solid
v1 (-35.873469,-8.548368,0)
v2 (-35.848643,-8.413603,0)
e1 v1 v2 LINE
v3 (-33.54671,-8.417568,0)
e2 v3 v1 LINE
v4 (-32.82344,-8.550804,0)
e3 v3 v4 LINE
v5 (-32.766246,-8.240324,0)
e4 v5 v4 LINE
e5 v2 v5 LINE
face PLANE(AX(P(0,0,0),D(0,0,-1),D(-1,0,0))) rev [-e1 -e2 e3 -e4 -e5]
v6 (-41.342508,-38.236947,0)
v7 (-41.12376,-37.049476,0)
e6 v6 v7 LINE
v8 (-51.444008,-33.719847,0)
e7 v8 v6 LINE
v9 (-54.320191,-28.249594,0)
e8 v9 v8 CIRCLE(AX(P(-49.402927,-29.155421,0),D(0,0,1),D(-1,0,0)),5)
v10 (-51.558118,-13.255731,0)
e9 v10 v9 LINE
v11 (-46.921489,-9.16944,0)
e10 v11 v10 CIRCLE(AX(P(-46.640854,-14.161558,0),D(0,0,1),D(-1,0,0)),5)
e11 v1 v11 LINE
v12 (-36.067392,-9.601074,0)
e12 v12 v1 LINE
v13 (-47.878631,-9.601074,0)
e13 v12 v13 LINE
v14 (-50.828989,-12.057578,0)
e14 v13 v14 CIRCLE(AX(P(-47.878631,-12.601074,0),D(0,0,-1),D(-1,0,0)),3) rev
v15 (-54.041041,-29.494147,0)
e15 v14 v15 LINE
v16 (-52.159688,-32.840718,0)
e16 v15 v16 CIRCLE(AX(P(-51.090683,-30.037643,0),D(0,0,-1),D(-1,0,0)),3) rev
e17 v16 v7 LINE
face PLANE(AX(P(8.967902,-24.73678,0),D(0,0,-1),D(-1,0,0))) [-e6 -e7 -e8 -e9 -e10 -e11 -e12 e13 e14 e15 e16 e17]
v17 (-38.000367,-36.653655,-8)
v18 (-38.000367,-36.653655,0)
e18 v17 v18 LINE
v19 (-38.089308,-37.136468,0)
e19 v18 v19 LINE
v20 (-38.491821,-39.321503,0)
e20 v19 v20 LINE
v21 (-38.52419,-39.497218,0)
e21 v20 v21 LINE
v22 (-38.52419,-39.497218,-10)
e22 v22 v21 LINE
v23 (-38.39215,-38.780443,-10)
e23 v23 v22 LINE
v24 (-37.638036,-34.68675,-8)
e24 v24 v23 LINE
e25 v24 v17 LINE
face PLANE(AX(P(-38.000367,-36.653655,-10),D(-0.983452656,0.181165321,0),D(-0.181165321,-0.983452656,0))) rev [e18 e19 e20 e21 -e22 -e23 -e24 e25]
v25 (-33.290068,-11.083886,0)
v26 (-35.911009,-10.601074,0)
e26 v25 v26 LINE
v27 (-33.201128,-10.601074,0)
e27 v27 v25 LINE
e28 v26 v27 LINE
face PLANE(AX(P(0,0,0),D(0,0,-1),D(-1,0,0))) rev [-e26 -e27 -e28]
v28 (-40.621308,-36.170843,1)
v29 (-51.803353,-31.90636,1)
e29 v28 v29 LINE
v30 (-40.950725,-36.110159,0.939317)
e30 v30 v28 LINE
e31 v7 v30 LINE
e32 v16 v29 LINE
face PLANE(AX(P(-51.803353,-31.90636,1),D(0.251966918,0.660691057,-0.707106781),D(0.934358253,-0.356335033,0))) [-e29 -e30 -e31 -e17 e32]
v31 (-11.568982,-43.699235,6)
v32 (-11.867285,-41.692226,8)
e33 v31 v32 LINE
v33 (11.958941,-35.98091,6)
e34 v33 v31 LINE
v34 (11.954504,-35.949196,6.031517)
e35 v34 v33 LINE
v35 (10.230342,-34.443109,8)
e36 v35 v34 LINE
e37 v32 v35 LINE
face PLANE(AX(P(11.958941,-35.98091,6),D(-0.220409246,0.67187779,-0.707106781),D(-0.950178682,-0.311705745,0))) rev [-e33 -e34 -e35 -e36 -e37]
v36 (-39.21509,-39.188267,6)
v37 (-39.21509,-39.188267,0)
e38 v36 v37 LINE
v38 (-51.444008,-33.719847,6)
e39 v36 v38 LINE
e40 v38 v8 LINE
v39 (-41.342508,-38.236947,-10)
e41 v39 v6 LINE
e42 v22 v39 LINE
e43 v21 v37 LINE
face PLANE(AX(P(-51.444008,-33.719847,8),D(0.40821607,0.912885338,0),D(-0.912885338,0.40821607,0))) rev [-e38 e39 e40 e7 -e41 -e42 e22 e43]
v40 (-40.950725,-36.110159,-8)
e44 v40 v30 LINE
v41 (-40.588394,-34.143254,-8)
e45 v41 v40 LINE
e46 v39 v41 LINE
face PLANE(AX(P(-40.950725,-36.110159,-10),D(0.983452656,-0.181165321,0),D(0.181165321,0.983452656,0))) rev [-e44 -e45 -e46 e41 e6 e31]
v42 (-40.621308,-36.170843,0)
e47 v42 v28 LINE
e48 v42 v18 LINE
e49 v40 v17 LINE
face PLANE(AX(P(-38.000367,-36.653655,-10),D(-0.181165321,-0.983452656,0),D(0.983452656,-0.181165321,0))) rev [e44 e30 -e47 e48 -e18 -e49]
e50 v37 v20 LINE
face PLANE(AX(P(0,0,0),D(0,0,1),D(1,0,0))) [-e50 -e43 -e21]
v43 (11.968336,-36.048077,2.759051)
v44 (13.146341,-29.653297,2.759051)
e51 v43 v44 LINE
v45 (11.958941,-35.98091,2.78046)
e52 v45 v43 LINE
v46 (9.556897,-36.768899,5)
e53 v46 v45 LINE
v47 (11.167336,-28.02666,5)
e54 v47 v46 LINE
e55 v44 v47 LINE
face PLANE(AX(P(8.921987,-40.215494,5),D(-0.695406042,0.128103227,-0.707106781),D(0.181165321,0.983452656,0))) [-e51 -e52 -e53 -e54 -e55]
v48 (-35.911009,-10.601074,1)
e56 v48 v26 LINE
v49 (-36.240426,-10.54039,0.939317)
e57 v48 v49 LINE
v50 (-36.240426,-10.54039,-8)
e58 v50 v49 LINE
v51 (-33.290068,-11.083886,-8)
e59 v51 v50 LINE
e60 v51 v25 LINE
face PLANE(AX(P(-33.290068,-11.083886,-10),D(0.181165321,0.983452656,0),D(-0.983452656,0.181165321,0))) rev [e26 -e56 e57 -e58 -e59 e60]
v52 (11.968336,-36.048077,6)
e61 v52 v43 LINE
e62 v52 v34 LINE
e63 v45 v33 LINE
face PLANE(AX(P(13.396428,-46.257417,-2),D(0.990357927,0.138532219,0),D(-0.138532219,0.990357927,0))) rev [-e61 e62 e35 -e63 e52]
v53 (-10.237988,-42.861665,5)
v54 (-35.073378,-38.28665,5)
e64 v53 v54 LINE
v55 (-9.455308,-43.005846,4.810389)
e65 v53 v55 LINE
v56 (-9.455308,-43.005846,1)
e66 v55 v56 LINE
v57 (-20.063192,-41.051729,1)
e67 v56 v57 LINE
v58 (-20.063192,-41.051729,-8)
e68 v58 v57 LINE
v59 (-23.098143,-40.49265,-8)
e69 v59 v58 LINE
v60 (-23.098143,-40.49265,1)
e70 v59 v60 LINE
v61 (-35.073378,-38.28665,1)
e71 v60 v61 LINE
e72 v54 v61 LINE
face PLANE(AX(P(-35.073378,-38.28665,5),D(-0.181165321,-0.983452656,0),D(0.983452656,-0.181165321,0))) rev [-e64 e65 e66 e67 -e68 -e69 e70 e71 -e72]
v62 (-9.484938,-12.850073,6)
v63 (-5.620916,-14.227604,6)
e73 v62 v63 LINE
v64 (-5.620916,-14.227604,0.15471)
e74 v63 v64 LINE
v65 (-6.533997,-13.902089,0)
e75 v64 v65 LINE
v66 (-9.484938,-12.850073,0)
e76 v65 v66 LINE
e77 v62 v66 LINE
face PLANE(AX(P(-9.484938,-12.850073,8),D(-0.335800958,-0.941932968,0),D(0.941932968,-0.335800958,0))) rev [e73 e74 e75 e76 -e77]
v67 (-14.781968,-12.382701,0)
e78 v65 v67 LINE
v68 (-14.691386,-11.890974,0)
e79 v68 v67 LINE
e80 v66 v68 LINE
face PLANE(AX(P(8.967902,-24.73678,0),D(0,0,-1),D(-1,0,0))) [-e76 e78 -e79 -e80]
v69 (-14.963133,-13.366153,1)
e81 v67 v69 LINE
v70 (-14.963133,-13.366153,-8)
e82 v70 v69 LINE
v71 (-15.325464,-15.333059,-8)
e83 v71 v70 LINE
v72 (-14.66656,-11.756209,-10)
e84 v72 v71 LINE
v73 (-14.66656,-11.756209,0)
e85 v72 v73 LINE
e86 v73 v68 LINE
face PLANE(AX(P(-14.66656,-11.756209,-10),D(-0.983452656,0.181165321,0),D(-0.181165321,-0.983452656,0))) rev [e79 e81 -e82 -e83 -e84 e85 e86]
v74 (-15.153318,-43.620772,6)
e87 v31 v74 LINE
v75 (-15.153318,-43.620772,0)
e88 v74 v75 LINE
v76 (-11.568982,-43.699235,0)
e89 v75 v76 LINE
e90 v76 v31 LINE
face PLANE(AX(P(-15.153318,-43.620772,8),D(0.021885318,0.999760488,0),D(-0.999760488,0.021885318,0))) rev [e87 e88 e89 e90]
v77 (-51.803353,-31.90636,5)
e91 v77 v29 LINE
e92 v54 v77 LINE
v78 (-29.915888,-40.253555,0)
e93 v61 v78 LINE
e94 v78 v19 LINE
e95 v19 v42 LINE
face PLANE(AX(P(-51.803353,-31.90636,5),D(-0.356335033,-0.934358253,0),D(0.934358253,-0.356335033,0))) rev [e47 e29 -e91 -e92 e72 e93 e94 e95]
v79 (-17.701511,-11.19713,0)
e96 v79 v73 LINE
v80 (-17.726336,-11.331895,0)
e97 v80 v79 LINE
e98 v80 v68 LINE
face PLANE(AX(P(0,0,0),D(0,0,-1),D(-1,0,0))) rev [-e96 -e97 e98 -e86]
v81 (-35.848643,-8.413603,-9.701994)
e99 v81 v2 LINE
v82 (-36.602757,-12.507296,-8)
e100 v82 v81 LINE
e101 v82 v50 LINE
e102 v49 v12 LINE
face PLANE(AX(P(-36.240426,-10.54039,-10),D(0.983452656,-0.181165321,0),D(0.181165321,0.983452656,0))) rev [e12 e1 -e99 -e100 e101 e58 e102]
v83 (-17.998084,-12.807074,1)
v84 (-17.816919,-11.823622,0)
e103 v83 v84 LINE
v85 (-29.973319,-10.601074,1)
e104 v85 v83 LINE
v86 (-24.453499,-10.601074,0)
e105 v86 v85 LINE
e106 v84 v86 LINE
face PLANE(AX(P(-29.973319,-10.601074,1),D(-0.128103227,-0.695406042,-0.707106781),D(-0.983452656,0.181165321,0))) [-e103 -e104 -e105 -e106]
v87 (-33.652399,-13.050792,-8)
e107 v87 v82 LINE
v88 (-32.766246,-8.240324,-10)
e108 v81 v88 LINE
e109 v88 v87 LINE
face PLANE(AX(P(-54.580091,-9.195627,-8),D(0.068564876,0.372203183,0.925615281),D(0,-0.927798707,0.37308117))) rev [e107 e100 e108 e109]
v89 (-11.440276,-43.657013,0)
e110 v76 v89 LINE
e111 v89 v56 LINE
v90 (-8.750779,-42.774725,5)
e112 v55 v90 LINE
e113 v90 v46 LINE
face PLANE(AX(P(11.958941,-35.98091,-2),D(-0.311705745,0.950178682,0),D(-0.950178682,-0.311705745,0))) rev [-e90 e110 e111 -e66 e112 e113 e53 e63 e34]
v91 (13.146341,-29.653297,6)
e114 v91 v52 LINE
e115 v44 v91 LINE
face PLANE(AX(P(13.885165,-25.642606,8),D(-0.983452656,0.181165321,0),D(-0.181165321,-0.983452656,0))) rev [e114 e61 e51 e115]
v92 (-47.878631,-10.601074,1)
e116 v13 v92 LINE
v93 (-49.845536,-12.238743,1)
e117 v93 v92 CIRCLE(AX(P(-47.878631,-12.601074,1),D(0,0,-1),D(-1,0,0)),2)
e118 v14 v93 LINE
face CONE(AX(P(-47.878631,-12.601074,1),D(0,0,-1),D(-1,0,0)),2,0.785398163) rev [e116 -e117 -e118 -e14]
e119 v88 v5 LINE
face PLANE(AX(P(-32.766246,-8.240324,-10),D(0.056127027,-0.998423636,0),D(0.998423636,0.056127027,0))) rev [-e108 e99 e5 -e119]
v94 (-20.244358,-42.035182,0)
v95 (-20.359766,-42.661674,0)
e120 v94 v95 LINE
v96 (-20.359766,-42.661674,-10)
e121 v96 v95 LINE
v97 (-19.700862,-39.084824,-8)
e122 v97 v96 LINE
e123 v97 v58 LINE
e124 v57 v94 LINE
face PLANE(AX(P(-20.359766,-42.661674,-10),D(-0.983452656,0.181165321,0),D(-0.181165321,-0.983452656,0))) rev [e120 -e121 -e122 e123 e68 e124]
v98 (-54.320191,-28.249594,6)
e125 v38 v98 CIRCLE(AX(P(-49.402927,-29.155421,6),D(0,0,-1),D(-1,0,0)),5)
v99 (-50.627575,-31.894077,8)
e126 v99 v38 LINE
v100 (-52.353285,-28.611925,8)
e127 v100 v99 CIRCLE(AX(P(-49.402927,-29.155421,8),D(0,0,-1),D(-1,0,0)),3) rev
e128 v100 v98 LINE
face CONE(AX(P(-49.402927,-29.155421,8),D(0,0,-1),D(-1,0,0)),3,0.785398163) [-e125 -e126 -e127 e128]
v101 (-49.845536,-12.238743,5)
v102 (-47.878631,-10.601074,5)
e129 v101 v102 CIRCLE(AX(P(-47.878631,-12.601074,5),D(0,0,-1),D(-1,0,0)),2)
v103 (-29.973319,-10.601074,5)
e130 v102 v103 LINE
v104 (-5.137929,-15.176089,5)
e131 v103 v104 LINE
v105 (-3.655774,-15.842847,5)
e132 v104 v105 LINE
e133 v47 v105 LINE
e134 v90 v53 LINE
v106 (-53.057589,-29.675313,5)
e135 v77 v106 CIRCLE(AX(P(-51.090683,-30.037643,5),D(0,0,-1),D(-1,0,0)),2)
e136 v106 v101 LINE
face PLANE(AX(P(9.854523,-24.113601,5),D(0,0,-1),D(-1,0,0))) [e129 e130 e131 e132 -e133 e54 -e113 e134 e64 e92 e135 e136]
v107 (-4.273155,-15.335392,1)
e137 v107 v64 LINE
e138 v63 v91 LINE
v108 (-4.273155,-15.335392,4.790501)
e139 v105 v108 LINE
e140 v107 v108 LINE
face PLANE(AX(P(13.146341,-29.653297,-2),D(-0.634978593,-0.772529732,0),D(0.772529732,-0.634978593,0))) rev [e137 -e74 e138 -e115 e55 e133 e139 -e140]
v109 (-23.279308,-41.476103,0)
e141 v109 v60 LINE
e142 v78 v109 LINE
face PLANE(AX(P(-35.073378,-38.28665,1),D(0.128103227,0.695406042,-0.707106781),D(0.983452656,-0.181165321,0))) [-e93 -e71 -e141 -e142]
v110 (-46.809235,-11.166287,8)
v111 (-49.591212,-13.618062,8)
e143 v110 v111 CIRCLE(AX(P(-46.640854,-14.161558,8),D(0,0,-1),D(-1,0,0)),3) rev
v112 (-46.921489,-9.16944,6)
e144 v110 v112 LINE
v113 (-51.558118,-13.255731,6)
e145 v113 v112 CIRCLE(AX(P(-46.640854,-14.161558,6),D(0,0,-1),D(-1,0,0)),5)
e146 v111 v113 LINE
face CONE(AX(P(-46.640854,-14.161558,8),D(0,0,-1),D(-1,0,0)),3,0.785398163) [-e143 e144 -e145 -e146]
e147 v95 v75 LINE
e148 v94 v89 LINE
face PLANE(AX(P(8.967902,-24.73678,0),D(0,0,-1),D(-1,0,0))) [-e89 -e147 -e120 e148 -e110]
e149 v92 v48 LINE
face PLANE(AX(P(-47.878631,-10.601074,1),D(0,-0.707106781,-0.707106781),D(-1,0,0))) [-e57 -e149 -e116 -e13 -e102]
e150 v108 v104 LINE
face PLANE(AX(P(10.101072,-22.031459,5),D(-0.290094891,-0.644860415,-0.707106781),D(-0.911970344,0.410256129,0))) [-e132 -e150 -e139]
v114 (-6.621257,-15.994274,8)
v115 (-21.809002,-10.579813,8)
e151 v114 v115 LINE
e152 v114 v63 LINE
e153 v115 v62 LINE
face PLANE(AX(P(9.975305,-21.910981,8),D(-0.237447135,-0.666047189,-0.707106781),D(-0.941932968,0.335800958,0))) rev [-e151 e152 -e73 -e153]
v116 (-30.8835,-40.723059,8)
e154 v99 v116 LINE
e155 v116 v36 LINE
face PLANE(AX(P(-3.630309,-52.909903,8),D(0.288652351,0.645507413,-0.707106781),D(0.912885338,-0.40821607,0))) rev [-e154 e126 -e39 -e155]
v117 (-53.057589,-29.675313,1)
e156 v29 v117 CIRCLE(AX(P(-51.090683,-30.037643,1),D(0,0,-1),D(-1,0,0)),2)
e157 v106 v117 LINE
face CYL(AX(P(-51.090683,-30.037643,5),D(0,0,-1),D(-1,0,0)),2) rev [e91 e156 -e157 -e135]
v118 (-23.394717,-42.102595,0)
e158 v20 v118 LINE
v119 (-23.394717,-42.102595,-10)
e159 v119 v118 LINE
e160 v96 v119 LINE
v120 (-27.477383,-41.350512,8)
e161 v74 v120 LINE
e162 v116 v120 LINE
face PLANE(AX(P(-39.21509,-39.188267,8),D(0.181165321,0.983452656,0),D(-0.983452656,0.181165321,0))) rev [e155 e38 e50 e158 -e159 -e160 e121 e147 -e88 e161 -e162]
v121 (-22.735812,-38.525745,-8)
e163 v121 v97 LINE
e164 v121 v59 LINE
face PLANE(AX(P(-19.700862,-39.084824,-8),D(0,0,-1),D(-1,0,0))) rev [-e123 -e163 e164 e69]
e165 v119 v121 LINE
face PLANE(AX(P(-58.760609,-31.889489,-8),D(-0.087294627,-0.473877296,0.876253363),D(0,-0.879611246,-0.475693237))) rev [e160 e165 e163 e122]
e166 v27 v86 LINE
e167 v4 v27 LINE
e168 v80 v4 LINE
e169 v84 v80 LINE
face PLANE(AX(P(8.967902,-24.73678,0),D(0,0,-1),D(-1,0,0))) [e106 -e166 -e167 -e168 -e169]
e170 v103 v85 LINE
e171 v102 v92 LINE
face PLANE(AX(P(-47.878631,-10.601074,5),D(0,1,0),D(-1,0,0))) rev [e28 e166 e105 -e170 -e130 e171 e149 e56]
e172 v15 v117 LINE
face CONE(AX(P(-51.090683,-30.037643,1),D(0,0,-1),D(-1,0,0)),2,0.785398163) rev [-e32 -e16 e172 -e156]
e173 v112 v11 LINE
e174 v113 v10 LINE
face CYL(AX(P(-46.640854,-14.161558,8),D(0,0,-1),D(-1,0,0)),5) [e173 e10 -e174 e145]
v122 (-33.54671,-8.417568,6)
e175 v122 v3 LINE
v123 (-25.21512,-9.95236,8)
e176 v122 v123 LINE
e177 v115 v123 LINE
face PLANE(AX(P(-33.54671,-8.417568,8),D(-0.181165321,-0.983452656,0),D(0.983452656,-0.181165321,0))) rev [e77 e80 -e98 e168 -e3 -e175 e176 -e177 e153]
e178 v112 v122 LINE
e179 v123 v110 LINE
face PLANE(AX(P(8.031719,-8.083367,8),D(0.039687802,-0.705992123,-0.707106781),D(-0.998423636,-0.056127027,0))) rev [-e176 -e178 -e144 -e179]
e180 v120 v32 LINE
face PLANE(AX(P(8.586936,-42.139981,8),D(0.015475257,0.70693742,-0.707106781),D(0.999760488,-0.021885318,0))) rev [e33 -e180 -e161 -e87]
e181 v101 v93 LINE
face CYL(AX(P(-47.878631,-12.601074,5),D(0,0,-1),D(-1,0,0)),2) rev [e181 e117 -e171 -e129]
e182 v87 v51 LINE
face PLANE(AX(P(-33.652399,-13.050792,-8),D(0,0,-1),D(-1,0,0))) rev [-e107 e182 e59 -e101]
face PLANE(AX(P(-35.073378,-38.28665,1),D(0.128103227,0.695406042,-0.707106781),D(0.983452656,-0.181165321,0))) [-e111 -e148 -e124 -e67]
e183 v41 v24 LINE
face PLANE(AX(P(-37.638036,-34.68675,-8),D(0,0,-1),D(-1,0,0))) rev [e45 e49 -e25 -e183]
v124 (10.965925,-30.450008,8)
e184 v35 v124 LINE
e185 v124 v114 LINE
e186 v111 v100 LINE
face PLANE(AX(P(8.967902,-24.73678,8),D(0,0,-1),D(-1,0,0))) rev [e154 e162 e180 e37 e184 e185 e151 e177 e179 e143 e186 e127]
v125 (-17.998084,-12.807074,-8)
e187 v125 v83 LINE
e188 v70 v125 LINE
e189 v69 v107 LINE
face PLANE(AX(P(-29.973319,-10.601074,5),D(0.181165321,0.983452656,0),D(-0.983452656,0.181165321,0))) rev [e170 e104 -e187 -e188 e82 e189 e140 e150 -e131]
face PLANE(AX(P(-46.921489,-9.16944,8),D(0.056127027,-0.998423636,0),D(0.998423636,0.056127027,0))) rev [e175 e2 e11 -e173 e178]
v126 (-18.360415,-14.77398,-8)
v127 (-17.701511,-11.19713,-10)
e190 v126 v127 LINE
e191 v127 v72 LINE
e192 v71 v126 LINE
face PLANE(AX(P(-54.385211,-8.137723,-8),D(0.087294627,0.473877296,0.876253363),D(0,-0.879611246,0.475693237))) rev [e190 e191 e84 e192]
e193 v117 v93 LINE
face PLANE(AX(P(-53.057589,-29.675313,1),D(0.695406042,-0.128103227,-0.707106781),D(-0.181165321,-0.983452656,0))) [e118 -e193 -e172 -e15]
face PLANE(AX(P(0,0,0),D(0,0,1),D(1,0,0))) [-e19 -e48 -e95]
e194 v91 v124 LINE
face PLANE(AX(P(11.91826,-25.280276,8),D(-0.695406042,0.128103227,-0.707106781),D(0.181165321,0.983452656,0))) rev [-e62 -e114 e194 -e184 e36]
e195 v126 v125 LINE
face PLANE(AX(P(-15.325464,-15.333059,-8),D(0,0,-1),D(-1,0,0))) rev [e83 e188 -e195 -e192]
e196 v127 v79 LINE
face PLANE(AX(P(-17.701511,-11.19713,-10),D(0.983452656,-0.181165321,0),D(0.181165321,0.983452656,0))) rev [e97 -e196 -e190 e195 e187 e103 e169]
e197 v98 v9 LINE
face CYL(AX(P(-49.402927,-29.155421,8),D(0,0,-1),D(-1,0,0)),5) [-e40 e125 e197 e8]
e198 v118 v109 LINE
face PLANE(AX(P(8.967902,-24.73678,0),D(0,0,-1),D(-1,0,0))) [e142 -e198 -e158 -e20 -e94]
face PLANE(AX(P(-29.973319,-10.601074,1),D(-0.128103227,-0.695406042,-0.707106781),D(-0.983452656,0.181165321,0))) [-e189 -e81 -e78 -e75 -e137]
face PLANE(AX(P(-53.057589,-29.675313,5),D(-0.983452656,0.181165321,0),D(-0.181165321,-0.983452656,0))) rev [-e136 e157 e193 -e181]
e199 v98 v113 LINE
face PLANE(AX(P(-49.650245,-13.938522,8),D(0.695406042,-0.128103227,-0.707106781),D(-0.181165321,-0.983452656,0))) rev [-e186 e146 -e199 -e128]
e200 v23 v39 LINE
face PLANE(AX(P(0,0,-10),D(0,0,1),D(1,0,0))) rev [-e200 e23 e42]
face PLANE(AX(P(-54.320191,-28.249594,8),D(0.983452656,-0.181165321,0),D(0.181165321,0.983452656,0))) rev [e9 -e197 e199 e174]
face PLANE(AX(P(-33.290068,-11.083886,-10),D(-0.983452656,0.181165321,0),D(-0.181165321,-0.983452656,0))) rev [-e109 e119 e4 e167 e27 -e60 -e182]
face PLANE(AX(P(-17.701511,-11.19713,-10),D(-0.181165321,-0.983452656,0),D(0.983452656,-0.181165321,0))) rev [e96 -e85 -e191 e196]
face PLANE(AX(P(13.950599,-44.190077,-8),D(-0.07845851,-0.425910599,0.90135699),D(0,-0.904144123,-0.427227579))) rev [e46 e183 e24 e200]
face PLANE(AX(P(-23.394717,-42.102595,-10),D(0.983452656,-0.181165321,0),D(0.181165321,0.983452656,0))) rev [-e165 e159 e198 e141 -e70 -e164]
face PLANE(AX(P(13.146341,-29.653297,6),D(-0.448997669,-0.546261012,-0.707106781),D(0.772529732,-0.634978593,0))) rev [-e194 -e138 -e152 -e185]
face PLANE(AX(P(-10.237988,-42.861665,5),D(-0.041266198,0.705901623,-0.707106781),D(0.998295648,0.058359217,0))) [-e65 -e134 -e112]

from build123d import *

# Parameters (mm, degrees)
BOSS_EXTRUDE1_DEPTH = 8
CUT_EXTRUDE1_DEPTH  = 5
CHAMFER1_SIZE       = 2
CHAMFER2_SIZE       = 2
BOSS_EXTRUDE2_DEPTH = 10
CHAMFER3_SIZE       = 5
CHAMFER5_SIZE       = 1
SKETCH4_W           = 3
SKETCH4_H           = 2
BOSS_EXTRUDE3_DEPTH = 2
CUT_EXTRUDE2_REACH  = 71.587
SKETCH8_W           = 3
SKETCH8_H           = 2
BOSS_EXTRUDE6_DEPTH = 2
SKETCH10_W          = 3.086016113
SKETCH10_H          = 2
BOSS_EXTRUDE7_DEPTH = 2
CUT_EXTRUDE6_REACH  = 65.526
CUT_EXTRUDE7_REACH  = 69.221
SKETCH14_W          = 3.086016113
SKETCH14_H          = 2
BOSS_EXTRUDE8_DEPTH = 2
CUT_EXTRUDE8_REACH  = 65.526
CUT_EXTRUDE9_DEPTH  = 10
CHAMFER6_SIZE       = 2


with BuildPart() as part:
    # Sketch1 → Boss-Extrude1 (new body)
    with BuildSketch(Plane.XY):
        with BuildLine():
            Line((-54.320190505, -28.24959399), (-51.558117567, -13.255731212))
            ThreePointArc((-51.558117567, -13.255731212), (-49.946755328, -10.410422216), (-46.921489424, -9.169439639))
            Line((-46.921489424, -9.169439639), (-33.546710063, -8.417567807))
            Line((-33.546710063, -8.417567807), (-9.484938073, -12.850072643))
            Line((-9.484938073, -12.850072643), (10.646906462, -20.027114874))
            ThreePointArc((10.646906462, -20.027114874), (13.299313006, -22.239005538), (13.885164949, -25.64260632))
            Line((13.885164949, -25.64260632), (11.241158147, -39.995549222))
            ThreePointArc((11.241158147, -39.995549222), (9.480940353, -42.966972131), (6.214468276, -44.088525055))
            Line((6.214468276, -44.088525055), (-15.153318385, -43.620772213))
            Line((-15.153318385, -43.620772213), (-39.215090375, -39.188267377))
            Line((-39.215090375, -39.188267377), (-51.444007577, -33.719847285))
            ThreePointArc((-51.444007577, -33.719847285), (-53.828484174, -31.482316748), (-54.320190505, -28.24959399))
        make_face()
    extrude(amount=BOSS_EXTRUDE1_DEPTH)

    # Sketch2 → Cut-Extrude1 (cut)
    with BuildSketch(Plane(origin=(0, 0, 0), x_dir=(-1, 0, 0), z_dir=(0, 0, -1))):
        with BuildLine():
            Line((53.057588595, -29.675312755), (49.84553587, -12.238742878))
            ThreePointArc((49.84553587, -12.238742878), (49.158345119, -11.064085999), (47.878630558, -10.601073521))
            Line((47.878630558, -10.601073521), (29.973319258, -10.601073521))
            Line((29.973319258, -10.601073521), (5.137929069, -15.176089324))
            Line((5.137929069, -15.176089324), (-10.10107167, -22.031458568))
            Line((-10.10107167, -22.031458568), (-10.675035013, -22.289659923))
            ThreePointArc((-10.675035013, -22.289659923), (-11.625784949, -23.184821715), (-11.821428067, -24.475931255))
            Line((-11.821428067, -24.475931255), (-8.921987001, -40.215494417))
            ThreePointArc((-8.921987001, -40.215494417), (-8.27911868, -41.352138774), (-7.071800124, -41.849755071))
            Line((-7.071800124, -41.849755071), (-6.443506549, -41.886484392))
            Line((-6.443506549, -41.886484392), (10.237987778, -42.861665394))
            Line((10.237987778, -42.861665394), (35.073377967, -38.286649591))
            Line((35.073377967, -38.286649591), (51.803353349, -31.906359903))
            ThreePointArc((51.803353349, -31.906359903), (52.834077643, -31.017733243), (53.057588595, -29.675312755))
        make_face()
    extrude(amount=-CUT_EXTRUDE1_DEPTH, mode=Mode.SUBTRACT)

    # Chamfer1
    chamfer1_edges = [part.edges().sort_by_distance(p)[0] for p in [
        (-4.469425054, -43.854648634, 8),
        (9.480940353, -42.966972131, 8),
        (12.563161548, -32.819077771, 8),
        (13.299313006, -22.239005538, 8),
        (0.580984195, -16.438593758, 8),
    ]]
    chamfer(chamfer1_edges, length=CHAMFER1_SIZE)

    # Chamfer2
    chamfer2_edges = [part.edges().sort_by_distance(p)[0] for p in [
        (-49.946755328, -10.410422216, 8),
        (-52.939154036, -20.752662601, 8),
        (-53.828484174, -31.482316748, 8),
        (-45.329548976, -36.454057331, 8),
        (-40.234099743, -8.793503723, 8),
    ]]
    chamfer(chamfer2_edges, length=CHAMFER2_SIZE)

    # Sketch3 → Boss-Extrude2 (add)
    with BuildSketch(Plane(origin=(0, 0, 0), x_dir=(-1, 0, 0), z_dir=(0, 0, -1))):
        Polygon((23.394716564, -42.102594861), (23.098142943, -40.492650345), (20.063192201, -41.051729445), (20.359765822, -42.661673961), align=None)
        Polygon((38.000366847, -36.653655449), (38.524189699, -39.49721829), (41.342508001, -38.236947396), (40.950724814, -36.110159485), align=None)
        Polygon((33.290068494, -11.083886396), (32.766245641, -8.240323555), (35.848643275, -8.413602522), (36.240426461, -10.540390432), align=None)
        Polygon((14.963133492, -13.366153375), (17.998084234, -12.807074275), (17.701510612, -11.197129759), (14.66655987, -11.756208859), align=None)
    extrude(amount=BOSS_EXTRUDE2_DEPTH)

    # Chamfer3
    # the kernel refuses this chamfer: 5 mm, written as the material it takes off along each edge
    with BuildSketch(Plane(origin=(-23.074487459, -43.612072424, 0), x_dir=(0.05833715256734155, -0.9979182097746037, -0.027495876610586372), z_dir=(0.998295648476819, 0.05835921720043501, 0))) as chamfer3_piece_1_section:
        Polygon((CHAMFER3_SIZE * 0.999621916911, -CHAMFER3_SIZE * 0.0274958766106), (-CHAMFER3_SIZE * 0.0274958766106, -CHAMFER3_SIZE * 0.999621916911), (0, 0), align=None)
    chamfer3_piece_1 = extrude(amount=30.197755173, mode=Mode.PRIVATE)
    chamfer3_piece_1 = split(chamfer3_piece_1, bisect_by=Plane(origin=(-2.089987913, -44.362637509, 2.130046666), z_dir=(0.18116532126255022, 0.9834526558873269, 0)), keep=Keep.TOP, mode=Mode.PRIVATE)
    add(chamfer3_piece_1, mode=Mode.SUBTRACT)
    with BuildSketch(Plane(origin=(6.95508169, -39.853163774, 0), x_dir=(0.9834526558873276, -0.18116532126254714, 0), z_dir=(0.18116532126254714, 0.9834526558873276, 0))) as chamfer3_piece_2:
        Polygon((2 + CHAMFER3_SIZE, 0), (2, -CHAMFER3_SIZE), (2, 0), align=None)
    revolve(axis=Axis((6.95508169, -39.853163774, 0), (0, 0, -1)), revolution_arc=76.216718402, mode=Mode.SUBTRACT)
    with BuildSketch(Plane(origin=(11.821428067, -24.475931255, 0), x_dir=(0.9830808290695956, -0.18109682571832125, -0.027495876610586386), z_dir=(-0.18116532126255008, -0.9834526558873269, 0))) as chamfer3_piece_3:
        Polygon((CHAMFER3_SIZE * 0.999621916911, CHAMFER3_SIZE * 0.0274958766106), (-CHAMFER3_SIZE * 0.0274958766106, CHAMFER3_SIZE * 0.999621916911), (0, 0), align=None)
    extrude(amount=16.004393366, mode=Mode.SUBTRACT)
    with BuildSketch(Plane(origin=(9.854522756, -24.113600612, 0), x_dir=(0.41025612875981127, 0.9119703442629113, 0), z_dir=(-0.9119703442629113, 0.41025612875981127, 0))) as chamfer3_piece_4:
        Polygon((2 + CHAMFER3_SIZE, 0), (2, -CHAMFER3_SIZE), (2, 0), align=None)
    revolve(axis=Axis((9.854522756, -24.113600612, 0), (0, 0, -1)), revolution_arc=76.216718402, mode=Mode.SUBTRACT)
    with BuildSketch(Plane(origin=(10.675035013, -22.289659923, 0), x_dir=(0.4101010178554897, 0.911625543698347, -0.02749587661058636), z_dir=(-0.9119703442629117, 0.41025612875981066, 0))) as chamfer3_piece_5_section:
        Polygon((CHAMFER3_SIZE * 0.999621916911, -CHAMFER3_SIZE * 0.0274958766106), (-CHAMFER3_SIZE * 0.0274958766106, -CHAMFER3_SIZE * 0.999621916911), (0, 0), align=None)
    chamfer3_piece_5 = extrude(amount=30.197755173, mode=Mode.PRIVATE)
    chamfer3_piece_5 = split(chamfer3_piece_5, bisect_by=Plane(origin=(3.019797747, -16.678853276, 2.155995237), z_dir=(-0.18116532126254994, -0.983452655887327, 0)), keep=Keep.TOP, mode=Mode.PRIVATE)
    add(chamfer3_piece_5, mode=Mode.SUBTRACT)

    # Chamfer5
    # the kernel refuses this chamfer: 1 mm, written as the material it takes off along each edge
    with BuildSketch(Plane(origin=(-23.098142943, -40.492650345, 0), x_dir=(0.004981299321445123, 0.02704089288890644, 0.9996219169110092), z_dir=(-0.9834526558873269, 0.18116532126255022, 0))) as chamfer5_piece_1_section:
        Polygon((CHAMFER5_SIZE * 0.999621916911, -CHAMFER5_SIZE * 0.0274958766104), (-CHAMFER5_SIZE * 0.027495876621, -CHAMFER5_SIZE * 0.999621916911), (0, 0), align=None)
    chamfer5_piece_1 = extrude(amount=14.748410513, mode=Mode.PRIVATE)
    chamfer5_piece_1 = split(chamfer5_piece_1, bisect_by=Plane(origin=(-28.668481956, -40.729276734, 0.347878309), z_dir=(0.35633503270067046, 0.9343582527436745, 0)), keep=Keep.TOP, mode=Mode.PRIVATE)
    add(chamfer5_piece_1, mode=Mode.SUBTRACT)
    with BuildSketch(Plane(origin=(-38.218434546, -37.087223316, 0), x_dir=(-0.3562003084508938, -0.9340049876895217, -0.02749587661058614), z_dir=(-0.9343582527436745, 0.35633503270067046, 0))) as chamfer5_piece_2_section:
        Polygon((CHAMFER5_SIZE * 0.999621916911, CHAMFER5_SIZE * 0.0274958766106), (-CHAMFER5_SIZE * 0.0274958766106, CHAMFER5_SIZE * 0.999621916911), (0, 0), align=None)
    chamfer5_piece_2 = extrude(amount=14.53930413, mode=Mode.PRIVATE)
    chamfer5_piece_2 = split(chamfer5_piece_2, bisect_by=Plane(origin=(-40.84035239, -36.130491583, 0.489990554), z_dir=(0.18116532126254972, 0.983452655887327, 0)), keep=Keep.TOP, mode=Mode.PRIVATE)
    add(chamfer5_piece_2, mode=Mode.SUBTRACT)
    with BuildSketch(Plane(origin=(-38.218434546, -37.087223316, 0), x_dir=(-0.3562003084508938, -0.9340049876895217, -0.02749587661058614), z_dir=(-0.9343582527436745, 0.35633503270067046, 0))) as chamfer5_piece_3_section:
        Polygon((CHAMFER5_SIZE * 0.999621916911, CHAMFER5_SIZE * 0.0274958766106), (-CHAMFER5_SIZE * 0.0274958766106, CHAMFER5_SIZE * 0.999621916911), (0, 0), align=None)
    chamfer5_piece_3 = extrude(amount=14.53930413, mode=Mode.PRIVATE)
    chamfer5_piece_3 = split(chamfer5_piece_3, bisect_by=Plane(origin=(-40.993983544, -36.344988713, 0.234829228), z_dir=(-0.9834526558873267, 0.18116532126255175, 0)), keep=Keep.TOP, mode=Mode.PRIVATE)
    add(chamfer5_piece_3, mode=Mode.SUBTRACT)
    with BuildSketch(Plane(origin=(1.897012872, -16.472021069, 0), x_dir=(-0.004981299319533664, -0.02704089287863599, 0.9996219169112968), z_dir=(-0.9834526558873531, 0.18116532126240795, 1.5207756333546186e-14))) as chamfer5_piece_4:
        Polygon((CHAMFER5_SIZE * 0.999621916911, CHAMFER5_SIZE * 0.0274958766106), (-CHAMFER5_SIZE * 0.0274958766106, CHAMFER5_SIZE * 0.999621916911), (0, 0), align=None)
    extrude(amount=17.143831239, mode=Mode.SUBTRACT)
    with BuildSketch(Plane(origin=(-32.502447723, -10.135173746, 0), x_dir=(-0.00498129931955216, -0.02704089287863057, 0.9996219169112968), z_dir=(0.983452655887327, -0.18116532126254994, 0))) as chamfer5_piece_5_section:
        Polygon((CHAMFER5_SIZE * 0.999621916911, -CHAMFER5_SIZE * 0.0274958766106), (-CHAMFER5_SIZE * 0.0274958766106, -CHAMFER5_SIZE * 0.999621916911), (0, 0), align=None)
    chamfer5_piece_5 = extrude(amount=14.748410513, mode=Mode.PRIVATE)
    chamfer5_piece_5 = split(chamfer5_piece_5, bisect_by=Plane(origin=(-23.118458189, -10.601073521, 0.347878309), z_dir=(0, -1, 0)), keep=Keep.TOP, mode=Mode.PRIVATE)
    add(chamfer5_piece_5, mode=Mode.SUBTRACT)
    with BuildSketch(Plane(origin=(-20.063192201, -41.051729445, 0), x_dir=(0.004981299321182515, 0.027040892887405597, 0.9996219169110512), z_dir=(0.9834526558873424, -0.18116532126246593, -1.60020737234311e-14))) as chamfer5_piece_6:
        Polygon((CHAMFER5_SIZE * 0.999621916911, CHAMFER5_SIZE * 0.0274958766105), (-CHAMFER5_SIZE * 0.0274958766195, CHAMFER5_SIZE * 0.999621916911), (0, 0), align=None)
    extrude(amount=17.991435412, mode=Mode.SUBTRACT)
    with BuildSketch(Plane(origin=(-51.090683283, -30.037643398, 0), x_dir=(-0.35633503270066896, -0.934358252743675, 0), z_dir=(0.934358252743675, -0.35633503270066896, 0))) as chamfer5_piece_7:
        Polygon((2 + CHAMFER5_SIZE, 0), (2, -CHAMFER5_SIZE), (2, 0), align=None)
    revolve(axis=Axis((-51.090683283, -30.037643398, 0), (0, 0, -1)), revolution_arc=79.562356174, mode=Mode.SUBTRACT)
    with BuildSketch(Plane(origin=(-53.057588595, -29.675312755, 0), x_dir=(-0.9830808290695958, 0.18109682571832017, -0.027495876610586695), z_dir=(0.18116532126254906, 0.9834526558873271, 0))) as chamfer5_piece_8:
        Polygon((CHAMFER5_SIZE * 0.999621916911, CHAMFER5_SIZE * 0.0274958766106), (-CHAMFER5_SIZE * 0.0274958766106, CHAMFER5_SIZE * 0.999621916911), (0, 0), align=None)
    extrude(amount=17.729953519, mode=Mode.SUBTRACT)
    with BuildSketch(Plane(origin=(-47.878630558, -12.601073521, 0), x_dir=(-0.983452655887328, 0.1811653212625444, 0), z_dir=(-0.1811653212625444, -0.983452655887328, 0))) as chamfer5_piece_9:
        Polygon((2 + CHAMFER5_SIZE, 0), (2, -CHAMFER5_SIZE), (2, 0), align=None)
    revolve(axis=Axis((-47.878630558, -12.601073521, 0), (0, 0, -1)), revolution_arc=79.562356174, mode=Mode.SUBTRACT)
    with BuildSketch(Plane(origin=(-47.878630558, -10.601073521, 0), x_dir=(0, 0.9996219169112968, -0.02749587661058632), z_dir=(1, 0, 0))) as chamfer5_piece_10_section:
        Polygon((CHAMFER5_SIZE * 0.999621916911, CHAMFER5_SIZE * 0.0274958766106), (-CHAMFER5_SIZE * 0.0274958766106, CHAMFER5_SIZE * 0.999621916911), (0, 0), align=None)
    chamfer5_piece_10 = extrude(amount=14.53930413, mode=Mode.PRIVATE)
    chamfer5_piece_10 = split(chamfer5_piece_10, bisect_by=Plane(origin=(-42.562463458, -9.375785449, 0.347894449), z_dir=(-0.18116532126254817, -0.9834526558873274, 0)), keep=Keep.TOP, mode=Mode.PRIVATE)
    add(chamfer5_piece_10, mode=Mode.SUBTRACT)
    with BuildSketch(Plane(origin=(-47.878630558, -10.601073521, 0), x_dir=(0, 0.9996219169112968, -0.02749587661058632), z_dir=(1, 0, 0))) as chamfer5_piece_11_section:
        Polygon((CHAMFER5_SIZE * 0.999621916911, CHAMFER5_SIZE * 0.0274958766106), (-CHAMFER5_SIZE * 0.0274958766106, CHAMFER5_SIZE * 0.999621916911), (0, 0), align=None)
    chamfer5_piece_11 = extrude(amount=14.53930413, mode=Mode.PRIVATE)
    chamfer5_piece_11 = split(chamfer5_piece_11, bisect_by=Plane(origin=(-36.197167732, -10.305561204, 0.234829228), z_dir=(-0.9834526558873272, 0.1811653212625484, 0)), keep=Keep.TOP, mode=Mode.PRIVATE)
    add(chamfer5_piece_11, mode=Mode.SUBTRACT)

    # Sketch4 → Boss-Extrude3 (add)
    with BuildSketch(Plane(origin=(-7.777695995, -42.221081437, 0), x_dir=(0.9834526558873268, -0.18116532126255072, 0), z_dir=(0.18116532126255072, 0.9834526558873268, 0))):
        with Locations((-32.231190435, 9)):
            Rectangle(SKETCH4_W, SKETCH4_H)
    extrude(amount=BOSS_EXTRUDE3_DEPTH)

    # Sketch5 → Cut-Extrude2 (cut, up to next)
    with BuildSketch(Plane(origin=(-33.17302882, 6.110921952, 0), x_dir=(0, 0, 1), z_dir=(-0.9834526558873264, 0.18116532126255258, 0)), mode=Mode.PRIVATE) as cut_extrude2_sk1:
        Polygon((-8, -40.931483467), (-10, -45.094056213), (-10, -40.931483467), align=None)
    cut_extrude2_tool1 = extrude(cut_extrude2_sk1.sketch, amount=-CUT_EXTRUDE2_REACH, mode=Mode.PRIVATE) & part.part
    add(cut_extrude2_tool1.solids().sort_by_distance((-40.839765, -35.507819, -9.333333))[0], mode=Mode.SUBTRACT)

    # Sketch8 → Boss-Extrude6 (add)
    with BuildSketch(Plane(origin=(-3.067397642, -16.651312384, 0), x_dir=(0.9834526558873273, -0.1811653212625481, 0), z_dir=(-0.1811653212625481, -0.9834526558873273, 0))):
        with Locations((-32.231190435, -9)):
            Rectangle(SKETCH8_W, SKETCH8_H)
    extrude(amount=BOSS_EXTRUDE6_DEPTH)

    # Sketch10 → Boss-Extrude7 (add)
    with BuildSketch(Plane(origin=(-2.872517463, -15.593408876, 0), x_dir=(0.983452655887327, -0.18116532126255, 0), z_dir=(-0.18116532126255, -0.983452655887327, 0))):
        with Locations((-13.837057959, -9)):
            Rectangle(SKETCH10_W, SKETCH10_H)
    extrude(amount=BOSS_EXTRUDE7_DEPTH)

    # Sketch12 → Cut-Extrude6 (cut, up to next)
    with BuildSketch(Plane(origin=(-12.090616028, 2.2272555, 0), x_dir=(0, 0, -1), z_dir=(0.9834526558873278, -0.18116532126254553, 0)), mode=Mode.PRIVATE) as cut_extrude6_sk1:
        Polygon((8, -17.855779922), (10, -14.218746856), (10, -17.855779922), align=None)
    cut_extrude6_tool1 = extrude(cut_extrude6_sk1.sketch, amount=-CUT_EXTRUDE6_REACH, mode=Mode.PRIVATE) & part.part
    add(cut_extrude6_tool1.solids().sort_by_distance((-15.105829, -14.140775, -9.333333))[0], mode=Mode.SUBTRACT)

    # Sketch13 → Cut-Extrude7 (cut, up to next)
    with BuildSketch(Plane(origin=(-30.222670852, 5.567425988, 0), x_dir=(0, 0, -1), z_dir=(0.9834526558873274, -0.18116532126254756, 0)), mode=Mode.PRIVATE) as cut_extrude7_sk1:
        Polygon((8, -18.931483467), (10, -14.040075503), (10, -18.931483467), align=None)
    cut_extrude7_tool1 = extrude(cut_extrude7_sk1.sketch, amount=-CUT_EXTRUDE7_REACH, mode=Mode.PRIVATE) & part.part
    add(cut_extrude7_tool1.solids().sort_by_distance((-33.357015, -11.447302, -9.333333))[0], mode=Mode.SUBTRACT)

    # Sketch14 → Boss-Extrude8 (add)
    with BuildSketch(Plane(origin=(-7.972576173, -43.278984945, 0), x_dir=(0.9834526558873271, -0.18116532126254975, 0), z_dir=(0.18116532126254975, 0.9834526558873271, 0))):
        with Locations((-13.837057959, 9)):
            Rectangle(SKETCH14_W, SKETCH14_H)
    extrude(amount=BOSS_EXTRUDE8_DEPTH)

    # Sketch15 → Cut-Extrude8 (cut, up to next)
    with BuildSketch(Plane(origin=(-12.090616028, 2.2272555, 0), x_dir=(0, 0, -1), z_dir=(0.9834526558873269, -0.18116532126255053, 0)), mode=Mode.PRIVATE) as cut_extrude8_sk1:
        Polygon((8, -42.007187012), (10, -45.644220078), (10, -42.007187012), align=None)
    cut_extrude8_tool1 = extrude(cut_extrude8_sk1.sketch, amount=-CUT_EXTRUDE8_REACH, mode=Mode.PRIVATE) & part.part
    add(cut_extrude8_tool1.solids().sort_by_distance((-19.920496, -40.277107, -9.333333))[0], mode=Mode.SUBTRACT)

    # Sketch17 → Cut-Extrude9 (cut)
    with BuildSketch(Plane.XY.offset(8)):
        Polygon((13.146341231, -29.653297454), (-7.687958424, -12.528604727), (18.211690395, -20.597072459), align=None)
        Polygon((-13.66636111, -44.387279773), (13.396428243, -46.257416903), (11.958940519, -35.980909599), align=None)
    extrude(amount=-CUT_EXTRUDE9_DEPTH, mode=Mode.SUBTRACT)

    # Chamfer6
    chamfer6_edges = [part.edges().sort_by_distance(p)[0] for p in [
        (5.160529327, -23.08938231, 8),
        (1.9826537, -39.253626587, 8),
    ]]
    chamfer(chamfer6_edges, length=CHAMFER6_SIZE)


solid = part.part
